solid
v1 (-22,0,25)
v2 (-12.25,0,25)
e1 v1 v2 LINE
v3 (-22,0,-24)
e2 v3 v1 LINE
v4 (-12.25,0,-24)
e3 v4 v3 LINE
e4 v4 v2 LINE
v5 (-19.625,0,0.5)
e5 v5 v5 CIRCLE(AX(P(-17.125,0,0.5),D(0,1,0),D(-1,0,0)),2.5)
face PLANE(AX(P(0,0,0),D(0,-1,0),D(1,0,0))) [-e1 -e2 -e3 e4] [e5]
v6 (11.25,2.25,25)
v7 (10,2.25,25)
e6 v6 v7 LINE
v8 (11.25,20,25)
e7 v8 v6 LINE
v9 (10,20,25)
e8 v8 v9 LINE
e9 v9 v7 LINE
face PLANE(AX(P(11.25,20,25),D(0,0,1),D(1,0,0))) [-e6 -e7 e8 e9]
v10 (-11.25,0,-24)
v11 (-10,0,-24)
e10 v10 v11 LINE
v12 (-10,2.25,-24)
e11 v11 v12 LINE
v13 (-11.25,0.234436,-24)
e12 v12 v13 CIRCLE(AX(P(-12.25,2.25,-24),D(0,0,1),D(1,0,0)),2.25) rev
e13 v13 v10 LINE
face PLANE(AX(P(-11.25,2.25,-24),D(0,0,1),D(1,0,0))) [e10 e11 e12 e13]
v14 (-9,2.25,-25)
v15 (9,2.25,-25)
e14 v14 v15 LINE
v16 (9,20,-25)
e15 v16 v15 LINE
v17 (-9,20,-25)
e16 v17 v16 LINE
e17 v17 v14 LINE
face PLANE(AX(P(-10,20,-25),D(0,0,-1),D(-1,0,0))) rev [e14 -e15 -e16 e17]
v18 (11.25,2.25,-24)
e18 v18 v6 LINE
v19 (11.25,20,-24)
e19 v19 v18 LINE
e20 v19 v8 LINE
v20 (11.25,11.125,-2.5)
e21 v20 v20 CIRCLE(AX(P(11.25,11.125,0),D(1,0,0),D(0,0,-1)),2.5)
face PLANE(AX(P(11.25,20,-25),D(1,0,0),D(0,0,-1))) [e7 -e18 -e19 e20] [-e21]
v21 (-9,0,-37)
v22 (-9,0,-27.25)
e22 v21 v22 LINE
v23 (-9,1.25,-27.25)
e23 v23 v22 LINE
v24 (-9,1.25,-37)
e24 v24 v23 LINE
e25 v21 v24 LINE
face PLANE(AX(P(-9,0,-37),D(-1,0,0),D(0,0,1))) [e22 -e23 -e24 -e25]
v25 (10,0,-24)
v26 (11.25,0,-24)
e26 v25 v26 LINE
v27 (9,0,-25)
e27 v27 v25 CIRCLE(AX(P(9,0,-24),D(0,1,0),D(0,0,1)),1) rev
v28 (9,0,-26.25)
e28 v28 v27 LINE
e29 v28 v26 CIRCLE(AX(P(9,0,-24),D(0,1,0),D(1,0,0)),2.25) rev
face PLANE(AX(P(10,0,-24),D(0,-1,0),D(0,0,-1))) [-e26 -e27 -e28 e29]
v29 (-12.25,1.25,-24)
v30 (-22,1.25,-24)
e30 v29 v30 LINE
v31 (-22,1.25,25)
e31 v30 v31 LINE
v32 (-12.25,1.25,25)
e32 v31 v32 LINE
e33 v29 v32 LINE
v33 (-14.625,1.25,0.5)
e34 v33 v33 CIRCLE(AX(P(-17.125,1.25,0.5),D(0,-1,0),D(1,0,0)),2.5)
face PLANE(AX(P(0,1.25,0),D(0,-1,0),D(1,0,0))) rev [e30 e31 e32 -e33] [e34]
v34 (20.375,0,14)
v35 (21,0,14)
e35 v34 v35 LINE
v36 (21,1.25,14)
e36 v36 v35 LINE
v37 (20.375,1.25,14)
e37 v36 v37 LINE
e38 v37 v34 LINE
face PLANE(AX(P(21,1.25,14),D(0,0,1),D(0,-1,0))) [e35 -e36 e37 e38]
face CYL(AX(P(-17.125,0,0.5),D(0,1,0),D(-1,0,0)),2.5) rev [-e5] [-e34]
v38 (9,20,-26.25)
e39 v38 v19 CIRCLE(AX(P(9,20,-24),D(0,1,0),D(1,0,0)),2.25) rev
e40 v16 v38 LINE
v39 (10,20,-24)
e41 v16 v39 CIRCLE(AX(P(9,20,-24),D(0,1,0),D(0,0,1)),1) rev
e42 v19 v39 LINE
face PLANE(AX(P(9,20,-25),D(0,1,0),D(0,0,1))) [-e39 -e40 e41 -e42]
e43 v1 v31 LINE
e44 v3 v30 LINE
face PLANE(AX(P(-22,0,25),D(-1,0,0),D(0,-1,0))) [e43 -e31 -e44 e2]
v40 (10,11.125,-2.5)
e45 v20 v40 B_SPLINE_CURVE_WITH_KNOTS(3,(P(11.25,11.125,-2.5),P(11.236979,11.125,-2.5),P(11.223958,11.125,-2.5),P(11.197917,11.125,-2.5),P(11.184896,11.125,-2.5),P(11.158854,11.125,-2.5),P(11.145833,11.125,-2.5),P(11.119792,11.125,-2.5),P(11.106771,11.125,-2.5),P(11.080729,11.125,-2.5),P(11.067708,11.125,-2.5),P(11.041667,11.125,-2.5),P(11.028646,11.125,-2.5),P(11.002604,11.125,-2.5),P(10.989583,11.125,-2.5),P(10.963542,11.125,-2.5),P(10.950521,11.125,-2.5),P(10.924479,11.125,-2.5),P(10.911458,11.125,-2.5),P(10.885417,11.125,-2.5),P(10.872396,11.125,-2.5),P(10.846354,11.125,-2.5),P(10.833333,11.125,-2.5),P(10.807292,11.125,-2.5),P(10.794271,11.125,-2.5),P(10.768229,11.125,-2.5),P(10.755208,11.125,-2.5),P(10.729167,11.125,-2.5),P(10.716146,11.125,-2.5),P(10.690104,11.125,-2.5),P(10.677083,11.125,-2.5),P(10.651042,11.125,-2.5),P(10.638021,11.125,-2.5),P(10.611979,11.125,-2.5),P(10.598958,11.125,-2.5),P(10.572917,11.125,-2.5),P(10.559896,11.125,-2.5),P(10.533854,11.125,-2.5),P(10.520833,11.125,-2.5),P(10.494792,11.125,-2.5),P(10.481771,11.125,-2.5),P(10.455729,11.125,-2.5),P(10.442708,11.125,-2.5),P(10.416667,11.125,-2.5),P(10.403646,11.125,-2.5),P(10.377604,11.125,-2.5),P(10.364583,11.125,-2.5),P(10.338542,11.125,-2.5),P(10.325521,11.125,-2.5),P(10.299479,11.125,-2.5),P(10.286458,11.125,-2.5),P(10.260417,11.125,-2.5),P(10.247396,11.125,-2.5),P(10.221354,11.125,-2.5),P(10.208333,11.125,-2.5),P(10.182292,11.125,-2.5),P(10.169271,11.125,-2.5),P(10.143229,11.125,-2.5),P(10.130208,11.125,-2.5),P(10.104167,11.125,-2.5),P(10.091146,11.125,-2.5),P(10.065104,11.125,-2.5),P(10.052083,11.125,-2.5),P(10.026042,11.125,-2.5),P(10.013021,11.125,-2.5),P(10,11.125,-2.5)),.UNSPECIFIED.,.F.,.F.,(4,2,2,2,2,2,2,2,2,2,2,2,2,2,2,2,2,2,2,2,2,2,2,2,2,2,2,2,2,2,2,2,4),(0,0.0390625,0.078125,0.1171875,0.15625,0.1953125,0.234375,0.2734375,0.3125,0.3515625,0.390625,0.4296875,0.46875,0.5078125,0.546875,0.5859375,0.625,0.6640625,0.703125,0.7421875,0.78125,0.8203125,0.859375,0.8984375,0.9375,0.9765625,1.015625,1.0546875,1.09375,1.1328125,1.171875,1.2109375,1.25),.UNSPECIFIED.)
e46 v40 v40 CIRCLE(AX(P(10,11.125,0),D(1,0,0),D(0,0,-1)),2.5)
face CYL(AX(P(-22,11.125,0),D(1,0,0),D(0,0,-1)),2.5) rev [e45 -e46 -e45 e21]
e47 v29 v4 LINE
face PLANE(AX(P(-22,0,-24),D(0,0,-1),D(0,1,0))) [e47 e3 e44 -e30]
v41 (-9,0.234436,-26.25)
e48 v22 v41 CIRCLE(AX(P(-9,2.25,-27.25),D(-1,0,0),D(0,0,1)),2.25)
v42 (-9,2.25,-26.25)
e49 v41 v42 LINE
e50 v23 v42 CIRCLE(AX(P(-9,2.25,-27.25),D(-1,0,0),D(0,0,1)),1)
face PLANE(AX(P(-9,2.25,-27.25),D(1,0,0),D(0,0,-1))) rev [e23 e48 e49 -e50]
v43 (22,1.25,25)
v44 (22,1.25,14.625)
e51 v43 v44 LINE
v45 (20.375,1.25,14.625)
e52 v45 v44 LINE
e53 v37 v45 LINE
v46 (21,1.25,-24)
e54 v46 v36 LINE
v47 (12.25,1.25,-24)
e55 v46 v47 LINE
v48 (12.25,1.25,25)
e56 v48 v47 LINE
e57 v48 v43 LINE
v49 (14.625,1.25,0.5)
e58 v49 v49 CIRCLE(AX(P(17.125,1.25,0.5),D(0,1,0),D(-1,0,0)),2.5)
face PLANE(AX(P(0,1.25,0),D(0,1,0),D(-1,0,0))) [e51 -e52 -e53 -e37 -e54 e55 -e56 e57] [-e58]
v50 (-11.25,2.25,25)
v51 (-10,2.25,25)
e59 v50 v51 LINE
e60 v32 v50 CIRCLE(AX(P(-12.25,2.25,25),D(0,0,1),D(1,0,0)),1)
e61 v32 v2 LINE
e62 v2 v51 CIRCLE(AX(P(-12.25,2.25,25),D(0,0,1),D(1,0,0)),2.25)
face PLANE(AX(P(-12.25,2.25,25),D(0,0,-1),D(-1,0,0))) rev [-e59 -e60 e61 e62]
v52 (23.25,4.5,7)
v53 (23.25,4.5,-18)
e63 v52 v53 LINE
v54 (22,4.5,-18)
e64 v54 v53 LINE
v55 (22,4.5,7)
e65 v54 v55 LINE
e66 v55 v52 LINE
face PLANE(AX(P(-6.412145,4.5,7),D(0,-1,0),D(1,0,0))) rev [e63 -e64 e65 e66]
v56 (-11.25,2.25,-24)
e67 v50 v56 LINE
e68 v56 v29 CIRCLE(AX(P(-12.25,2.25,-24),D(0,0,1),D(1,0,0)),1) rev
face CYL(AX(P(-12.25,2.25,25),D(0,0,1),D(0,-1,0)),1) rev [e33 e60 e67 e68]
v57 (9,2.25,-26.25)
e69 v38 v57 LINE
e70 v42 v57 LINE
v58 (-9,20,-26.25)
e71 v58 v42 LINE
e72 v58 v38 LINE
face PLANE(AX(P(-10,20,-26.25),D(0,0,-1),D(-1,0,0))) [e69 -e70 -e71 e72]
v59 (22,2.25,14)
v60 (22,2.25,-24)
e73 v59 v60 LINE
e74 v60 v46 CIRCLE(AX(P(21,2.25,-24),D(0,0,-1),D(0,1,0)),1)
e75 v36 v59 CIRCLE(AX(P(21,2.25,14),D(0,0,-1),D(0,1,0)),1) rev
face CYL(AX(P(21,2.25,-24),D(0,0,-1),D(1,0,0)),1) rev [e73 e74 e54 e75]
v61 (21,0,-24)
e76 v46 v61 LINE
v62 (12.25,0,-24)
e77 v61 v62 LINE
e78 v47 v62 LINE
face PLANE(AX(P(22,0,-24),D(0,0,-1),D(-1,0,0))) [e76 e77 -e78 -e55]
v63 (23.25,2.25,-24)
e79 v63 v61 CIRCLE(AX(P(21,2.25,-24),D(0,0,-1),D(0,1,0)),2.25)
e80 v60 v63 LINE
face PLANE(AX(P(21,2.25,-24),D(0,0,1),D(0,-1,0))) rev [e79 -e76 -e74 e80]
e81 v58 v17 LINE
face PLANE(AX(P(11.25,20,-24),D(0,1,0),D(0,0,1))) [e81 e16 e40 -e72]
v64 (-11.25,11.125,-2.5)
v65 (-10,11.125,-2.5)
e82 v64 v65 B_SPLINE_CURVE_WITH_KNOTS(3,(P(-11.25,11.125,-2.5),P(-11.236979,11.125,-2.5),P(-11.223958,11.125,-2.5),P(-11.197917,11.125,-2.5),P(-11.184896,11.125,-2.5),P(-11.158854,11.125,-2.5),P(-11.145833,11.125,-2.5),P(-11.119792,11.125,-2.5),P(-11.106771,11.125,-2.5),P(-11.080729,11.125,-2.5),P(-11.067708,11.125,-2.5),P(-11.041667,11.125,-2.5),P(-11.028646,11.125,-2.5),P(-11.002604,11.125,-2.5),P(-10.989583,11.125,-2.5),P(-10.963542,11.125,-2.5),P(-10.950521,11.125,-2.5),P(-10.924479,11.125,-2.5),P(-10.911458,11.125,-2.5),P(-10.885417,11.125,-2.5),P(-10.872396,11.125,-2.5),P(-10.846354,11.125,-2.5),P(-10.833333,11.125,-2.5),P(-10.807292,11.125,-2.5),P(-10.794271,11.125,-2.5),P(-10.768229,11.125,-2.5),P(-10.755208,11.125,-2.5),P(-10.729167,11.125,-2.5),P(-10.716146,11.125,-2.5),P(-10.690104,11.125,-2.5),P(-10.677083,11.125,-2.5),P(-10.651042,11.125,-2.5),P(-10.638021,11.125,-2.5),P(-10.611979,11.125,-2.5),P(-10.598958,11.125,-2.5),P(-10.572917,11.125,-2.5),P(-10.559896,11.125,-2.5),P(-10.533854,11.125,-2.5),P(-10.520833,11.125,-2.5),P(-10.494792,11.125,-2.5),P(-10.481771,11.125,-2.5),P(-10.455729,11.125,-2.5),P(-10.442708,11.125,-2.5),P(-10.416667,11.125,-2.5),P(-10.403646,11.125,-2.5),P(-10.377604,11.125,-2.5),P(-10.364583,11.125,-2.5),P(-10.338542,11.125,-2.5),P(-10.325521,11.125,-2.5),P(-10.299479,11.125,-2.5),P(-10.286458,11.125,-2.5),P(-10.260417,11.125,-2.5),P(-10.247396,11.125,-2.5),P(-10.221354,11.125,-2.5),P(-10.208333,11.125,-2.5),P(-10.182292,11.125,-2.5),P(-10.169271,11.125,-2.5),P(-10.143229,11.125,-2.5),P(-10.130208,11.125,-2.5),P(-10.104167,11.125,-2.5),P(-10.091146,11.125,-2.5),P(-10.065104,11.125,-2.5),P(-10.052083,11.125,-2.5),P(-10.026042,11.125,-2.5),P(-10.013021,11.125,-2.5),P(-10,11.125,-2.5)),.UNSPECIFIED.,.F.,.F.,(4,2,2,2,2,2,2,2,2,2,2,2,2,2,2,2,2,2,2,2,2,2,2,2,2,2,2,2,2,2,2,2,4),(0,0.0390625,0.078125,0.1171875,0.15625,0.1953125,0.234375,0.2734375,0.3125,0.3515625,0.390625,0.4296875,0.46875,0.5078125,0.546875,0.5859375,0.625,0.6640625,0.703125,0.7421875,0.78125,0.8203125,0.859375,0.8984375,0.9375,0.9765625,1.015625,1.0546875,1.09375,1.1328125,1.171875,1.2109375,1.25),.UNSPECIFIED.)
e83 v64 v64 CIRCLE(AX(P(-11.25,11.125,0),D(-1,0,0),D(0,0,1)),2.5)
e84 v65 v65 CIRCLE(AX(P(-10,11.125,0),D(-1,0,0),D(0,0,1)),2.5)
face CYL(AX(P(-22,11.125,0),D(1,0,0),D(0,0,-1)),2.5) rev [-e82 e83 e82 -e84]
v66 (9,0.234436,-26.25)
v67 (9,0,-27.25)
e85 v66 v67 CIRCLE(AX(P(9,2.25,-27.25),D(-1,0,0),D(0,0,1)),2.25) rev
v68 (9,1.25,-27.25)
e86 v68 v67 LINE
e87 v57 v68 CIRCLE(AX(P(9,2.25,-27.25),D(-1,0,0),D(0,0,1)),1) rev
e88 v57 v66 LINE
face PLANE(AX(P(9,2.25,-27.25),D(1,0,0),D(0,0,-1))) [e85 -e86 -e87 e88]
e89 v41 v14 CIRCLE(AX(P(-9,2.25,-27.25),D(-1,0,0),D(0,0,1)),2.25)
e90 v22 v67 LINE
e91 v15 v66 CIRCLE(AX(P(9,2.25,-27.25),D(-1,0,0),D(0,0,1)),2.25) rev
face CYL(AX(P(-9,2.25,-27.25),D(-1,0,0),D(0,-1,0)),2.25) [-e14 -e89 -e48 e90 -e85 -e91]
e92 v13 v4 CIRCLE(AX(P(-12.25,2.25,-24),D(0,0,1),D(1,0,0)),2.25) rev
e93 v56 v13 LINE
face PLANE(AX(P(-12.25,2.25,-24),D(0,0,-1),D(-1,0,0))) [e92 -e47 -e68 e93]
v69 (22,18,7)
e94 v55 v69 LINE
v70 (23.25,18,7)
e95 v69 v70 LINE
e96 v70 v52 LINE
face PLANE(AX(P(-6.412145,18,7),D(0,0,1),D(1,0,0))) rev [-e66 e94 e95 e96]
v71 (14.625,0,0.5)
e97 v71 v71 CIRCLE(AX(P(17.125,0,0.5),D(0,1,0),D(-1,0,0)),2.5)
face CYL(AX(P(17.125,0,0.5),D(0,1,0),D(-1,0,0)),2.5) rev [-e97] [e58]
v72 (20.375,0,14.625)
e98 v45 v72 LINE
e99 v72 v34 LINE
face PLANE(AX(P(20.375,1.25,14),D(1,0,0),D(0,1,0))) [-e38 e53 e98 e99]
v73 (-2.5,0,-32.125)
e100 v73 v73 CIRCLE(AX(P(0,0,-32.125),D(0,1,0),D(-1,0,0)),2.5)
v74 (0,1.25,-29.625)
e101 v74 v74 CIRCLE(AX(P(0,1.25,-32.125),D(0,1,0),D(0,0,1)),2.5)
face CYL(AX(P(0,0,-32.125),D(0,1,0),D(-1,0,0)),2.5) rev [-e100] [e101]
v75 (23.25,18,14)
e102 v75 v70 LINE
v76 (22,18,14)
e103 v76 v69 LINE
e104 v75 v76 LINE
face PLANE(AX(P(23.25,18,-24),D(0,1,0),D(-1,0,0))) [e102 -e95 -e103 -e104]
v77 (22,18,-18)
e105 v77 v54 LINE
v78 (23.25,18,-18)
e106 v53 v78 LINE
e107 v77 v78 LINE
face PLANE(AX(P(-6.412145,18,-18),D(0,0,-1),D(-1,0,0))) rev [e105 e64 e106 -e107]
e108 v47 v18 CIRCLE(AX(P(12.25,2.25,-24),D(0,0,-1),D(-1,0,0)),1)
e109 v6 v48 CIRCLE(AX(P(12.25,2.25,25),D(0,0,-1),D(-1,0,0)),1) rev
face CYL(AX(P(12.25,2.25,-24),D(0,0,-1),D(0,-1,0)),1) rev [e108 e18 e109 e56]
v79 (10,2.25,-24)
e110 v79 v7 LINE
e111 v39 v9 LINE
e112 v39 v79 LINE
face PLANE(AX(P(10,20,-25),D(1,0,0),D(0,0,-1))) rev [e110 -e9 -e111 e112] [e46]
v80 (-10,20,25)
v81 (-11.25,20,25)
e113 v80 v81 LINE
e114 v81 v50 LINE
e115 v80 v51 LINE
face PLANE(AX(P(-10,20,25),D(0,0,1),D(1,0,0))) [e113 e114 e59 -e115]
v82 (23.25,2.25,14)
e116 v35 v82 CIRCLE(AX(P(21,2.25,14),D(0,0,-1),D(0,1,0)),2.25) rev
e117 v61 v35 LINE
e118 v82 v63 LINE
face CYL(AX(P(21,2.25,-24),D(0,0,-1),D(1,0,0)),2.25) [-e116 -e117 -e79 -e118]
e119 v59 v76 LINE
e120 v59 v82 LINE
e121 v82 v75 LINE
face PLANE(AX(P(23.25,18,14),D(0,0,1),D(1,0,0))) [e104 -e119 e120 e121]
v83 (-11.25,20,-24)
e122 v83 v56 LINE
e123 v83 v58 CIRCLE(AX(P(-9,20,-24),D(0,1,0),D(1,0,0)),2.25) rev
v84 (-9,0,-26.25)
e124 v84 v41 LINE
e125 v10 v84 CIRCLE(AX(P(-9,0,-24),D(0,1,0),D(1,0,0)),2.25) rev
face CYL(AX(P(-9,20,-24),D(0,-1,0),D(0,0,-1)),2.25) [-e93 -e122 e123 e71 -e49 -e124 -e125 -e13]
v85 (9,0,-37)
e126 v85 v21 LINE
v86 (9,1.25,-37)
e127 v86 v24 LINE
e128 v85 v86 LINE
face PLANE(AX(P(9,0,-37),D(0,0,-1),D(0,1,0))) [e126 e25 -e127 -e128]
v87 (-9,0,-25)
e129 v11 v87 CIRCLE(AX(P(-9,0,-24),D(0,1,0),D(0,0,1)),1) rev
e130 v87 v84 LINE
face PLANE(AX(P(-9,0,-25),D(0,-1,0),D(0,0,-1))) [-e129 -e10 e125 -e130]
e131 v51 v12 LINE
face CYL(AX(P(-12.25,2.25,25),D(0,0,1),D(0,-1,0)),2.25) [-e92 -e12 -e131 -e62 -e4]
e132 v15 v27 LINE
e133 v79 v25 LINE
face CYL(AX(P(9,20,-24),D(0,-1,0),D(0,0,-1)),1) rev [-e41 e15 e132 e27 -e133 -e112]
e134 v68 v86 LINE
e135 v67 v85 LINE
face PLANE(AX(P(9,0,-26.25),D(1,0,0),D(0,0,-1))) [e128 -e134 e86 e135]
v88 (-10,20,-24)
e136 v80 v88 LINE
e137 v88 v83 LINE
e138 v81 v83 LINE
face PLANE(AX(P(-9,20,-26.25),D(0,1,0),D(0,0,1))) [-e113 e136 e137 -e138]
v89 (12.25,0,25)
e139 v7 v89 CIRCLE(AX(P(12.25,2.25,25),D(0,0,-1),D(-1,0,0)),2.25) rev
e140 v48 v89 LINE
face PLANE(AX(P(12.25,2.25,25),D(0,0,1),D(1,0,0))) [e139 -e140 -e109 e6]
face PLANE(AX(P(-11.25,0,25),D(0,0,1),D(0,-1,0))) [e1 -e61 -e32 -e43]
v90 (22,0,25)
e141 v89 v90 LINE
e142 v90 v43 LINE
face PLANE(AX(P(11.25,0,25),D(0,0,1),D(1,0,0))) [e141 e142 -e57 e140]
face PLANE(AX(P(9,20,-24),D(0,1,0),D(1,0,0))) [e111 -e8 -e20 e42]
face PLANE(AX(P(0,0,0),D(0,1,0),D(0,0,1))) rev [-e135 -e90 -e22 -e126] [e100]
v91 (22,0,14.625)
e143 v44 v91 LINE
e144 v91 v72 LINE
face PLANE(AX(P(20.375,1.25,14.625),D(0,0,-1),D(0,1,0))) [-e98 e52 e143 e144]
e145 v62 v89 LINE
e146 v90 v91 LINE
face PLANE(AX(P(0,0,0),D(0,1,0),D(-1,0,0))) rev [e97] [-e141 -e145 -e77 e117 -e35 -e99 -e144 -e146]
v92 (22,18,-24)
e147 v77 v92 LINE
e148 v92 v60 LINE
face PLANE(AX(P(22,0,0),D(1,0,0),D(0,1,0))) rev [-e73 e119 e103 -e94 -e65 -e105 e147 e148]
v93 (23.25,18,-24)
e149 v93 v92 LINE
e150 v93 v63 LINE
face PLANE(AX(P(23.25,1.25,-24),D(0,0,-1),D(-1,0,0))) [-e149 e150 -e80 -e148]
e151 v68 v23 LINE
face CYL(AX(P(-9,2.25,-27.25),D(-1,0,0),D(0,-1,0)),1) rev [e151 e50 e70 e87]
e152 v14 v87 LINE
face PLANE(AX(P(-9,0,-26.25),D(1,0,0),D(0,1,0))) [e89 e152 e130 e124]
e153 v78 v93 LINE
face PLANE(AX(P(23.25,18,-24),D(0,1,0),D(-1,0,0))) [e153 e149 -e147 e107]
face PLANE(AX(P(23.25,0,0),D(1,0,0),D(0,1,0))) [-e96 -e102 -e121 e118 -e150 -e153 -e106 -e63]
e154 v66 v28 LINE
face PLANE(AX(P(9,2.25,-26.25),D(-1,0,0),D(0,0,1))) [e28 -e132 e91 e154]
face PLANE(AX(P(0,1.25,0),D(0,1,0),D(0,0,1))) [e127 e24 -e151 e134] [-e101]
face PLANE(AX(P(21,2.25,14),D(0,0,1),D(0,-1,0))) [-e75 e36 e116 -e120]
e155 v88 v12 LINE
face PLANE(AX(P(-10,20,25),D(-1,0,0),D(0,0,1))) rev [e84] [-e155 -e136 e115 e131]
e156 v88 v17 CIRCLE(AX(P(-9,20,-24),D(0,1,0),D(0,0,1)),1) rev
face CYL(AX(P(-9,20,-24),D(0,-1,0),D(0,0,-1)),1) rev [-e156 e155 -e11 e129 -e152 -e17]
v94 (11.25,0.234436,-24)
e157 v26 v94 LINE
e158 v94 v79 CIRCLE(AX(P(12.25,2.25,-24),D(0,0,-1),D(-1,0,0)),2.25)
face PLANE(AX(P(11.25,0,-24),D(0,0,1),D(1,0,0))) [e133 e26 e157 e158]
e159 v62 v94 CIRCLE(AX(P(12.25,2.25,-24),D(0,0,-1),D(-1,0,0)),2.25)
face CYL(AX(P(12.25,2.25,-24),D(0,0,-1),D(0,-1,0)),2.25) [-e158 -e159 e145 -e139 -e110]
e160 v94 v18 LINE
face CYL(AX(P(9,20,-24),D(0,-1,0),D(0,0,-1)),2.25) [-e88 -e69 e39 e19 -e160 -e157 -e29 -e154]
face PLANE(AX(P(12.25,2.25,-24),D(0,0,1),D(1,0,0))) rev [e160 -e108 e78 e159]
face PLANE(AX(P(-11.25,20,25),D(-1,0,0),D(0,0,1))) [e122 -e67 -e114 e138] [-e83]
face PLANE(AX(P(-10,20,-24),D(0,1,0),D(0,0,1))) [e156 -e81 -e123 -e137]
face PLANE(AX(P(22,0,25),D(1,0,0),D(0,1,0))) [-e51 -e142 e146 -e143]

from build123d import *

# Parameters (mm, degrees)
BASE_FLANGE1_DEPTH             = 20
EDGE_FLANGE1_STRIP_W           = 7
EDGE_FLANGE1_STRIP_H           = 1.25
EDGE_FLANGE1_STRIP_CUT_DEPTH   = 49
EDGE_FLANGE1_STRIP_2_W         = 7
EDGE_FLANGE1_STRIP_2_H         = 1.25
EDGE_FLANGE1_STRIP_CUT_2_DEPTH = 18
EDGE_FLANGE1_STRIP_3_W         = 7
EDGE_FLANGE1_STRIP_3_H         = 1.25
EDGE_FLANGE1_STRIP_CUT_3_DEPTH = 49
EDGE_FLANGE1_DEPTH             = 49
EDGE_FLANGE1_BEND_DEPTH        = 18
EDGE_FLANGE1_BEND_2_DEPTH      = 49
CUT_EXTRUDE1_DEPTH             = 47.952768821
CUT_EXTRUDE1_DEPTH_BACK        = 47.952768821
SKETCH15_R                     = 2.5
CUT_EXTRUDE2_DEPTH             = 54.61494661
CUT_EXTRUDE2_DEPTH_BACK        = 54.61494661
SKETCH16_R                     = 2.5
EDGE_FLANGE2_STRIP_W           = 7
EDGE_FLANGE2_STRIP_H           = 1.25
EDGE_FLANGE2_STRIP_CUT_DEPTH   = 38
EDGE_FLANGE2_RELIEF_W          = 7.625
EDGE_FLANGE2_RELIEF_H          = 0.625
EDGE_FLANGE2_RELIEF_CUT_DEPTH  = 1.25
EDGE_FLANGE2_DEPTH             = 38
CUT_EXTRUDE3_DEPTH             = 62.778333581
CUT_EXTRUDE3_DEPTH_BACK        = 1.25
SKETCH20_W                     = 25
SKETCH20_H                     = 13.5


# Sheet-metal steps are written as plain solids
with BuildPart() as part:
    # Sketch1 → Base-Flange1 (new body)
    with BuildSketch(Plane(origin=(0, 0, 0), x_dir=(1, 0, 0), z_dir=(0, 1, 0))):
        with BuildLine():
            Line((-10, -25), (-10, 24))
            ThreePointArc((-10, 24), (-9.707106781, 24.707106781), (-9, 25))
            Line((-9, 25), (9, 25))
            ThreePointArc((9, 25), (9.707106781, 24.707106781), (10, 24))
            Line((10, 24), (10, -25))
            Line((10, -25), (11.25, -25))
            Line((11.25, -25), (11.25, 24))
            ThreePointArc((11.25, 24), (10.590990258, 25.590990258), (9, 26.25))
            Line((9, 26.25), (-9, 26.25))
            ThreePointArc((-9, 26.25), (-10.590990258, 25.590990258), (-11.25, 24))
            Line((-11.25, 24), (-11.25, -25))
            Line((-11.25, -25), (-10, -25))
        make_face()
    extrude(amount=BASE_FLANGE1_DEPTH)

    # Edge-Flange1 strip (across the edge) → Edge-Flange1 strip cut (cut)
    with BuildSketch(Plane(origin=(-11.25, 0, -24), x_dir=(0, 1, 0), z_dir=(0, 0, 1))):
        with Locations((-1.25, -0.625)):
            Rectangle(EDGE_FLANGE1_STRIP_W, EDGE_FLANGE1_STRIP_H)
    extrude(amount=EDGE_FLANGE1_STRIP_CUT_DEPTH, mode=Mode.SUBTRACT)

    # Edge-Flange1 strip 2 (across the edge) → Edge-Flange1 strip cut 2 (cut)
    with BuildSketch(Plane(origin=(9, 0, -26.25), x_dir=(0, 1, 0), z_dir=(-1, 0, 0))):
        with Locations((-1.25, -0.625)):
            Rectangle(EDGE_FLANGE1_STRIP_2_W, EDGE_FLANGE1_STRIP_2_H)
    extrude(amount=EDGE_FLANGE1_STRIP_CUT_2_DEPTH, mode=Mode.SUBTRACT)

    # Edge-Flange1 strip 3 (across the edge) → Edge-Flange1 strip cut 3 (cut)
    with BuildSketch(Plane(origin=(11.25, 0, 25), x_dir=(0, 1, 0), z_dir=(0, 0, -1))):
        with Locations((-1.25, -0.625)):
            Rectangle(EDGE_FLANGE1_STRIP_3_W, EDGE_FLANGE1_STRIP_3_H)
    extrude(amount=EDGE_FLANGE1_STRIP_CUT_3_DEPTH, mode=Mode.SUBTRACT)

    # Edge-Flange1 section (across the edge) → Edge-Flange1 (add)
    with BuildSketch(Plane(origin=(-11.25, 0, -24), x_dir=(0, 1, 0), z_dir=(0, 0, 1))):
        with BuildLine():
            Line((0, 1), (0, 10.75))
            Line((0, 10.75), (1.25, 10.75))
            Line((1.25, 10.75), (1.25, 1))
            ThreePointArc((1.25, 1), (1.542893219, 0.292893219), (2.25, 0))
            Line((2.25, 0), (2.25, -1.25))
            ThreePointArc((2.25, -1.25), (0.659009742, -0.590990258), (0, 1))
        make_face()
    extrude(amount=EDGE_FLANGE1_DEPTH)

    # Edge-Flange1 section 2 (across the edge) → Edge-Flange1 bend (add)
    with BuildSketch(Plane(origin=(9, 0, -26.25), x_dir=(0, 1, 0), z_dir=(-1, 0, 0))):
        with BuildLine():
            Line((0, 1), (0, 10.75))
            Line((0, 10.75), (1.25, 10.75))
            Line((1.25, 10.75), (1.25, 1))
            ThreePointArc((1.25, 1), (1.542893219, 0.292893219), (2.25, 0))
            Line((2.25, 0), (2.25, -1.25))
            ThreePointArc((2.25, -1.25), (0.659009742, -0.590990258), (0, 1))
        make_face()
    extrude(amount=EDGE_FLANGE1_BEND_DEPTH)

    # Edge-Flange1 section 3 (across the edge) → Edge-Flange1 bend 2 (add)
    with BuildSketch(Plane(origin=(11.25, 0, 25), x_dir=(0, 1, 0), z_dir=(0, 0, -1))):
        with BuildLine():
            Line((0, 1), (0, 10.75))
            Line((0, 10.75), (1.25, 10.75))
            Line((1.25, 10.75), (1.25, 1))
            ThreePointArc((1.25, 1), (1.542893219, 0.292893219), (2.25, 0))
            Line((2.25, 0), (2.25, -1.25))
            ThreePointArc((2.25, -1.25), (0.659009742, -0.590990258), (0, 1))
        make_face()
    extrude(amount=EDGE_FLANGE1_BEND_2_DEPTH)

    # Sketch15 → Cut-Extrude1 (cut, two sides: drawn at the far end of the back side and taken through both)
    with BuildSketch(Plane(origin=(0, 1.25, 0), x_dir=(1, 0, 0), z_dir=(0, 1, 0)).offset(-CUT_EXTRUDE1_DEPTH_BACK)):
        with Locations(Location((17.125, -0.5, 0), (0, 0, 180))):
            Circle(SKETCH15_R)
        with Locations(Location((0, 32.125, 0), (0, 0, 180))):
            Circle(SKETCH15_R)
        with Locations(Location((-17.125, -0.5, 0), (0, 0, 180))):
            Circle(SKETCH15_R)
    extrude(amount=CUT_EXTRUDE1_DEPTH + CUT_EXTRUDE1_DEPTH_BACK, mode=Mode.SUBTRACT)

    # Sketch16 → Cut-Extrude2 (cut, two sides: drawn at the far end of the back side and taken through both)
    with BuildSketch(Plane(origin=(11.25, 0, 0), x_dir=(0, 0, -1), z_dir=(1, 0, 0)).offset(-CUT_EXTRUDE2_DEPTH_BACK)):
        with Locations((0, 11.125)):
            Circle(SKETCH16_R)
    extrude(amount=CUT_EXTRUDE2_DEPTH + CUT_EXTRUDE2_DEPTH_BACK, mode=Mode.SUBTRACT)

    # Edge-Flange2 strip (across the edge) → Edge-Flange2 strip cut (cut)
    with BuildSketch(Plane(origin=(22, 1.25, 14), x_dir=(-1, 0, 0), z_dir=(0, 0, -1))):
        with Locations((-2.5, -0.625)):
            Rectangle(EDGE_FLANGE2_STRIP_W, EDGE_FLANGE2_STRIP_H)
    extrude(amount=EDGE_FLANGE2_STRIP_CUT_DEPTH, mode=Mode.SUBTRACT)

    # Edge-Flange2 relief (on the sheet) → Edge-Flange2 relief cut (cut)
    with BuildSketch(Plane(origin=(21, 1.25, 14), x_dir=(-1, 0, 0), z_dir=(0, 1, 0))):
        with Locations((-3.1875, 0.3125)):
            Rectangle(EDGE_FLANGE2_RELIEF_W, EDGE_FLANGE2_RELIEF_H)
    extrude(amount=-EDGE_FLANGE2_RELIEF_CUT_DEPTH, mode=Mode.SUBTRACT)

    # Edge-Flange2 section (across the edge) → Edge-Flange2 (add)
    with BuildSketch(Plane(origin=(22, 1.25, 14), x_dir=(-1, 0, 0), z_dir=(0, 0, -1))):
        with BuildLine():
            Line((-1.25, 1), (-1.25, 16.75))
            Line((-1.25, 16.75), (0, 16.75))
            Line((0, 16.75), (0, 1))
            ThreePointArc((0, 1), (0.292893219, 0.292893219), (1, 0))
            Line((1, 0), (1, -1.25))
            ThreePointArc((1, -1.25), (-0.590990258, -0.590990258), (-1.25, 1))
        make_face()
    extrude(amount=EDGE_FLANGE2_DEPTH)

    # Sketch20 → Cut-Extrude3 (cut, two sides: drawn at the far end of the back side and taken through both)
    with BuildSketch(Plane(origin=(23.25, 0, 0), x_dir=(0, 0, -1), z_dir=(1, 0, 0)).offset(-CUT_EXTRUDE3_DEPTH_BACK)):
        with Locations((5.5, 11.25)):
            Rectangle(SKETCH20_W, SKETCH20_H)
    extrude(amount=CUT_EXTRUDE3_DEPTH + CUT_EXTRUDE3_DEPTH_BACK, mode=Mode.SUBTRACT)


solid = part.part
